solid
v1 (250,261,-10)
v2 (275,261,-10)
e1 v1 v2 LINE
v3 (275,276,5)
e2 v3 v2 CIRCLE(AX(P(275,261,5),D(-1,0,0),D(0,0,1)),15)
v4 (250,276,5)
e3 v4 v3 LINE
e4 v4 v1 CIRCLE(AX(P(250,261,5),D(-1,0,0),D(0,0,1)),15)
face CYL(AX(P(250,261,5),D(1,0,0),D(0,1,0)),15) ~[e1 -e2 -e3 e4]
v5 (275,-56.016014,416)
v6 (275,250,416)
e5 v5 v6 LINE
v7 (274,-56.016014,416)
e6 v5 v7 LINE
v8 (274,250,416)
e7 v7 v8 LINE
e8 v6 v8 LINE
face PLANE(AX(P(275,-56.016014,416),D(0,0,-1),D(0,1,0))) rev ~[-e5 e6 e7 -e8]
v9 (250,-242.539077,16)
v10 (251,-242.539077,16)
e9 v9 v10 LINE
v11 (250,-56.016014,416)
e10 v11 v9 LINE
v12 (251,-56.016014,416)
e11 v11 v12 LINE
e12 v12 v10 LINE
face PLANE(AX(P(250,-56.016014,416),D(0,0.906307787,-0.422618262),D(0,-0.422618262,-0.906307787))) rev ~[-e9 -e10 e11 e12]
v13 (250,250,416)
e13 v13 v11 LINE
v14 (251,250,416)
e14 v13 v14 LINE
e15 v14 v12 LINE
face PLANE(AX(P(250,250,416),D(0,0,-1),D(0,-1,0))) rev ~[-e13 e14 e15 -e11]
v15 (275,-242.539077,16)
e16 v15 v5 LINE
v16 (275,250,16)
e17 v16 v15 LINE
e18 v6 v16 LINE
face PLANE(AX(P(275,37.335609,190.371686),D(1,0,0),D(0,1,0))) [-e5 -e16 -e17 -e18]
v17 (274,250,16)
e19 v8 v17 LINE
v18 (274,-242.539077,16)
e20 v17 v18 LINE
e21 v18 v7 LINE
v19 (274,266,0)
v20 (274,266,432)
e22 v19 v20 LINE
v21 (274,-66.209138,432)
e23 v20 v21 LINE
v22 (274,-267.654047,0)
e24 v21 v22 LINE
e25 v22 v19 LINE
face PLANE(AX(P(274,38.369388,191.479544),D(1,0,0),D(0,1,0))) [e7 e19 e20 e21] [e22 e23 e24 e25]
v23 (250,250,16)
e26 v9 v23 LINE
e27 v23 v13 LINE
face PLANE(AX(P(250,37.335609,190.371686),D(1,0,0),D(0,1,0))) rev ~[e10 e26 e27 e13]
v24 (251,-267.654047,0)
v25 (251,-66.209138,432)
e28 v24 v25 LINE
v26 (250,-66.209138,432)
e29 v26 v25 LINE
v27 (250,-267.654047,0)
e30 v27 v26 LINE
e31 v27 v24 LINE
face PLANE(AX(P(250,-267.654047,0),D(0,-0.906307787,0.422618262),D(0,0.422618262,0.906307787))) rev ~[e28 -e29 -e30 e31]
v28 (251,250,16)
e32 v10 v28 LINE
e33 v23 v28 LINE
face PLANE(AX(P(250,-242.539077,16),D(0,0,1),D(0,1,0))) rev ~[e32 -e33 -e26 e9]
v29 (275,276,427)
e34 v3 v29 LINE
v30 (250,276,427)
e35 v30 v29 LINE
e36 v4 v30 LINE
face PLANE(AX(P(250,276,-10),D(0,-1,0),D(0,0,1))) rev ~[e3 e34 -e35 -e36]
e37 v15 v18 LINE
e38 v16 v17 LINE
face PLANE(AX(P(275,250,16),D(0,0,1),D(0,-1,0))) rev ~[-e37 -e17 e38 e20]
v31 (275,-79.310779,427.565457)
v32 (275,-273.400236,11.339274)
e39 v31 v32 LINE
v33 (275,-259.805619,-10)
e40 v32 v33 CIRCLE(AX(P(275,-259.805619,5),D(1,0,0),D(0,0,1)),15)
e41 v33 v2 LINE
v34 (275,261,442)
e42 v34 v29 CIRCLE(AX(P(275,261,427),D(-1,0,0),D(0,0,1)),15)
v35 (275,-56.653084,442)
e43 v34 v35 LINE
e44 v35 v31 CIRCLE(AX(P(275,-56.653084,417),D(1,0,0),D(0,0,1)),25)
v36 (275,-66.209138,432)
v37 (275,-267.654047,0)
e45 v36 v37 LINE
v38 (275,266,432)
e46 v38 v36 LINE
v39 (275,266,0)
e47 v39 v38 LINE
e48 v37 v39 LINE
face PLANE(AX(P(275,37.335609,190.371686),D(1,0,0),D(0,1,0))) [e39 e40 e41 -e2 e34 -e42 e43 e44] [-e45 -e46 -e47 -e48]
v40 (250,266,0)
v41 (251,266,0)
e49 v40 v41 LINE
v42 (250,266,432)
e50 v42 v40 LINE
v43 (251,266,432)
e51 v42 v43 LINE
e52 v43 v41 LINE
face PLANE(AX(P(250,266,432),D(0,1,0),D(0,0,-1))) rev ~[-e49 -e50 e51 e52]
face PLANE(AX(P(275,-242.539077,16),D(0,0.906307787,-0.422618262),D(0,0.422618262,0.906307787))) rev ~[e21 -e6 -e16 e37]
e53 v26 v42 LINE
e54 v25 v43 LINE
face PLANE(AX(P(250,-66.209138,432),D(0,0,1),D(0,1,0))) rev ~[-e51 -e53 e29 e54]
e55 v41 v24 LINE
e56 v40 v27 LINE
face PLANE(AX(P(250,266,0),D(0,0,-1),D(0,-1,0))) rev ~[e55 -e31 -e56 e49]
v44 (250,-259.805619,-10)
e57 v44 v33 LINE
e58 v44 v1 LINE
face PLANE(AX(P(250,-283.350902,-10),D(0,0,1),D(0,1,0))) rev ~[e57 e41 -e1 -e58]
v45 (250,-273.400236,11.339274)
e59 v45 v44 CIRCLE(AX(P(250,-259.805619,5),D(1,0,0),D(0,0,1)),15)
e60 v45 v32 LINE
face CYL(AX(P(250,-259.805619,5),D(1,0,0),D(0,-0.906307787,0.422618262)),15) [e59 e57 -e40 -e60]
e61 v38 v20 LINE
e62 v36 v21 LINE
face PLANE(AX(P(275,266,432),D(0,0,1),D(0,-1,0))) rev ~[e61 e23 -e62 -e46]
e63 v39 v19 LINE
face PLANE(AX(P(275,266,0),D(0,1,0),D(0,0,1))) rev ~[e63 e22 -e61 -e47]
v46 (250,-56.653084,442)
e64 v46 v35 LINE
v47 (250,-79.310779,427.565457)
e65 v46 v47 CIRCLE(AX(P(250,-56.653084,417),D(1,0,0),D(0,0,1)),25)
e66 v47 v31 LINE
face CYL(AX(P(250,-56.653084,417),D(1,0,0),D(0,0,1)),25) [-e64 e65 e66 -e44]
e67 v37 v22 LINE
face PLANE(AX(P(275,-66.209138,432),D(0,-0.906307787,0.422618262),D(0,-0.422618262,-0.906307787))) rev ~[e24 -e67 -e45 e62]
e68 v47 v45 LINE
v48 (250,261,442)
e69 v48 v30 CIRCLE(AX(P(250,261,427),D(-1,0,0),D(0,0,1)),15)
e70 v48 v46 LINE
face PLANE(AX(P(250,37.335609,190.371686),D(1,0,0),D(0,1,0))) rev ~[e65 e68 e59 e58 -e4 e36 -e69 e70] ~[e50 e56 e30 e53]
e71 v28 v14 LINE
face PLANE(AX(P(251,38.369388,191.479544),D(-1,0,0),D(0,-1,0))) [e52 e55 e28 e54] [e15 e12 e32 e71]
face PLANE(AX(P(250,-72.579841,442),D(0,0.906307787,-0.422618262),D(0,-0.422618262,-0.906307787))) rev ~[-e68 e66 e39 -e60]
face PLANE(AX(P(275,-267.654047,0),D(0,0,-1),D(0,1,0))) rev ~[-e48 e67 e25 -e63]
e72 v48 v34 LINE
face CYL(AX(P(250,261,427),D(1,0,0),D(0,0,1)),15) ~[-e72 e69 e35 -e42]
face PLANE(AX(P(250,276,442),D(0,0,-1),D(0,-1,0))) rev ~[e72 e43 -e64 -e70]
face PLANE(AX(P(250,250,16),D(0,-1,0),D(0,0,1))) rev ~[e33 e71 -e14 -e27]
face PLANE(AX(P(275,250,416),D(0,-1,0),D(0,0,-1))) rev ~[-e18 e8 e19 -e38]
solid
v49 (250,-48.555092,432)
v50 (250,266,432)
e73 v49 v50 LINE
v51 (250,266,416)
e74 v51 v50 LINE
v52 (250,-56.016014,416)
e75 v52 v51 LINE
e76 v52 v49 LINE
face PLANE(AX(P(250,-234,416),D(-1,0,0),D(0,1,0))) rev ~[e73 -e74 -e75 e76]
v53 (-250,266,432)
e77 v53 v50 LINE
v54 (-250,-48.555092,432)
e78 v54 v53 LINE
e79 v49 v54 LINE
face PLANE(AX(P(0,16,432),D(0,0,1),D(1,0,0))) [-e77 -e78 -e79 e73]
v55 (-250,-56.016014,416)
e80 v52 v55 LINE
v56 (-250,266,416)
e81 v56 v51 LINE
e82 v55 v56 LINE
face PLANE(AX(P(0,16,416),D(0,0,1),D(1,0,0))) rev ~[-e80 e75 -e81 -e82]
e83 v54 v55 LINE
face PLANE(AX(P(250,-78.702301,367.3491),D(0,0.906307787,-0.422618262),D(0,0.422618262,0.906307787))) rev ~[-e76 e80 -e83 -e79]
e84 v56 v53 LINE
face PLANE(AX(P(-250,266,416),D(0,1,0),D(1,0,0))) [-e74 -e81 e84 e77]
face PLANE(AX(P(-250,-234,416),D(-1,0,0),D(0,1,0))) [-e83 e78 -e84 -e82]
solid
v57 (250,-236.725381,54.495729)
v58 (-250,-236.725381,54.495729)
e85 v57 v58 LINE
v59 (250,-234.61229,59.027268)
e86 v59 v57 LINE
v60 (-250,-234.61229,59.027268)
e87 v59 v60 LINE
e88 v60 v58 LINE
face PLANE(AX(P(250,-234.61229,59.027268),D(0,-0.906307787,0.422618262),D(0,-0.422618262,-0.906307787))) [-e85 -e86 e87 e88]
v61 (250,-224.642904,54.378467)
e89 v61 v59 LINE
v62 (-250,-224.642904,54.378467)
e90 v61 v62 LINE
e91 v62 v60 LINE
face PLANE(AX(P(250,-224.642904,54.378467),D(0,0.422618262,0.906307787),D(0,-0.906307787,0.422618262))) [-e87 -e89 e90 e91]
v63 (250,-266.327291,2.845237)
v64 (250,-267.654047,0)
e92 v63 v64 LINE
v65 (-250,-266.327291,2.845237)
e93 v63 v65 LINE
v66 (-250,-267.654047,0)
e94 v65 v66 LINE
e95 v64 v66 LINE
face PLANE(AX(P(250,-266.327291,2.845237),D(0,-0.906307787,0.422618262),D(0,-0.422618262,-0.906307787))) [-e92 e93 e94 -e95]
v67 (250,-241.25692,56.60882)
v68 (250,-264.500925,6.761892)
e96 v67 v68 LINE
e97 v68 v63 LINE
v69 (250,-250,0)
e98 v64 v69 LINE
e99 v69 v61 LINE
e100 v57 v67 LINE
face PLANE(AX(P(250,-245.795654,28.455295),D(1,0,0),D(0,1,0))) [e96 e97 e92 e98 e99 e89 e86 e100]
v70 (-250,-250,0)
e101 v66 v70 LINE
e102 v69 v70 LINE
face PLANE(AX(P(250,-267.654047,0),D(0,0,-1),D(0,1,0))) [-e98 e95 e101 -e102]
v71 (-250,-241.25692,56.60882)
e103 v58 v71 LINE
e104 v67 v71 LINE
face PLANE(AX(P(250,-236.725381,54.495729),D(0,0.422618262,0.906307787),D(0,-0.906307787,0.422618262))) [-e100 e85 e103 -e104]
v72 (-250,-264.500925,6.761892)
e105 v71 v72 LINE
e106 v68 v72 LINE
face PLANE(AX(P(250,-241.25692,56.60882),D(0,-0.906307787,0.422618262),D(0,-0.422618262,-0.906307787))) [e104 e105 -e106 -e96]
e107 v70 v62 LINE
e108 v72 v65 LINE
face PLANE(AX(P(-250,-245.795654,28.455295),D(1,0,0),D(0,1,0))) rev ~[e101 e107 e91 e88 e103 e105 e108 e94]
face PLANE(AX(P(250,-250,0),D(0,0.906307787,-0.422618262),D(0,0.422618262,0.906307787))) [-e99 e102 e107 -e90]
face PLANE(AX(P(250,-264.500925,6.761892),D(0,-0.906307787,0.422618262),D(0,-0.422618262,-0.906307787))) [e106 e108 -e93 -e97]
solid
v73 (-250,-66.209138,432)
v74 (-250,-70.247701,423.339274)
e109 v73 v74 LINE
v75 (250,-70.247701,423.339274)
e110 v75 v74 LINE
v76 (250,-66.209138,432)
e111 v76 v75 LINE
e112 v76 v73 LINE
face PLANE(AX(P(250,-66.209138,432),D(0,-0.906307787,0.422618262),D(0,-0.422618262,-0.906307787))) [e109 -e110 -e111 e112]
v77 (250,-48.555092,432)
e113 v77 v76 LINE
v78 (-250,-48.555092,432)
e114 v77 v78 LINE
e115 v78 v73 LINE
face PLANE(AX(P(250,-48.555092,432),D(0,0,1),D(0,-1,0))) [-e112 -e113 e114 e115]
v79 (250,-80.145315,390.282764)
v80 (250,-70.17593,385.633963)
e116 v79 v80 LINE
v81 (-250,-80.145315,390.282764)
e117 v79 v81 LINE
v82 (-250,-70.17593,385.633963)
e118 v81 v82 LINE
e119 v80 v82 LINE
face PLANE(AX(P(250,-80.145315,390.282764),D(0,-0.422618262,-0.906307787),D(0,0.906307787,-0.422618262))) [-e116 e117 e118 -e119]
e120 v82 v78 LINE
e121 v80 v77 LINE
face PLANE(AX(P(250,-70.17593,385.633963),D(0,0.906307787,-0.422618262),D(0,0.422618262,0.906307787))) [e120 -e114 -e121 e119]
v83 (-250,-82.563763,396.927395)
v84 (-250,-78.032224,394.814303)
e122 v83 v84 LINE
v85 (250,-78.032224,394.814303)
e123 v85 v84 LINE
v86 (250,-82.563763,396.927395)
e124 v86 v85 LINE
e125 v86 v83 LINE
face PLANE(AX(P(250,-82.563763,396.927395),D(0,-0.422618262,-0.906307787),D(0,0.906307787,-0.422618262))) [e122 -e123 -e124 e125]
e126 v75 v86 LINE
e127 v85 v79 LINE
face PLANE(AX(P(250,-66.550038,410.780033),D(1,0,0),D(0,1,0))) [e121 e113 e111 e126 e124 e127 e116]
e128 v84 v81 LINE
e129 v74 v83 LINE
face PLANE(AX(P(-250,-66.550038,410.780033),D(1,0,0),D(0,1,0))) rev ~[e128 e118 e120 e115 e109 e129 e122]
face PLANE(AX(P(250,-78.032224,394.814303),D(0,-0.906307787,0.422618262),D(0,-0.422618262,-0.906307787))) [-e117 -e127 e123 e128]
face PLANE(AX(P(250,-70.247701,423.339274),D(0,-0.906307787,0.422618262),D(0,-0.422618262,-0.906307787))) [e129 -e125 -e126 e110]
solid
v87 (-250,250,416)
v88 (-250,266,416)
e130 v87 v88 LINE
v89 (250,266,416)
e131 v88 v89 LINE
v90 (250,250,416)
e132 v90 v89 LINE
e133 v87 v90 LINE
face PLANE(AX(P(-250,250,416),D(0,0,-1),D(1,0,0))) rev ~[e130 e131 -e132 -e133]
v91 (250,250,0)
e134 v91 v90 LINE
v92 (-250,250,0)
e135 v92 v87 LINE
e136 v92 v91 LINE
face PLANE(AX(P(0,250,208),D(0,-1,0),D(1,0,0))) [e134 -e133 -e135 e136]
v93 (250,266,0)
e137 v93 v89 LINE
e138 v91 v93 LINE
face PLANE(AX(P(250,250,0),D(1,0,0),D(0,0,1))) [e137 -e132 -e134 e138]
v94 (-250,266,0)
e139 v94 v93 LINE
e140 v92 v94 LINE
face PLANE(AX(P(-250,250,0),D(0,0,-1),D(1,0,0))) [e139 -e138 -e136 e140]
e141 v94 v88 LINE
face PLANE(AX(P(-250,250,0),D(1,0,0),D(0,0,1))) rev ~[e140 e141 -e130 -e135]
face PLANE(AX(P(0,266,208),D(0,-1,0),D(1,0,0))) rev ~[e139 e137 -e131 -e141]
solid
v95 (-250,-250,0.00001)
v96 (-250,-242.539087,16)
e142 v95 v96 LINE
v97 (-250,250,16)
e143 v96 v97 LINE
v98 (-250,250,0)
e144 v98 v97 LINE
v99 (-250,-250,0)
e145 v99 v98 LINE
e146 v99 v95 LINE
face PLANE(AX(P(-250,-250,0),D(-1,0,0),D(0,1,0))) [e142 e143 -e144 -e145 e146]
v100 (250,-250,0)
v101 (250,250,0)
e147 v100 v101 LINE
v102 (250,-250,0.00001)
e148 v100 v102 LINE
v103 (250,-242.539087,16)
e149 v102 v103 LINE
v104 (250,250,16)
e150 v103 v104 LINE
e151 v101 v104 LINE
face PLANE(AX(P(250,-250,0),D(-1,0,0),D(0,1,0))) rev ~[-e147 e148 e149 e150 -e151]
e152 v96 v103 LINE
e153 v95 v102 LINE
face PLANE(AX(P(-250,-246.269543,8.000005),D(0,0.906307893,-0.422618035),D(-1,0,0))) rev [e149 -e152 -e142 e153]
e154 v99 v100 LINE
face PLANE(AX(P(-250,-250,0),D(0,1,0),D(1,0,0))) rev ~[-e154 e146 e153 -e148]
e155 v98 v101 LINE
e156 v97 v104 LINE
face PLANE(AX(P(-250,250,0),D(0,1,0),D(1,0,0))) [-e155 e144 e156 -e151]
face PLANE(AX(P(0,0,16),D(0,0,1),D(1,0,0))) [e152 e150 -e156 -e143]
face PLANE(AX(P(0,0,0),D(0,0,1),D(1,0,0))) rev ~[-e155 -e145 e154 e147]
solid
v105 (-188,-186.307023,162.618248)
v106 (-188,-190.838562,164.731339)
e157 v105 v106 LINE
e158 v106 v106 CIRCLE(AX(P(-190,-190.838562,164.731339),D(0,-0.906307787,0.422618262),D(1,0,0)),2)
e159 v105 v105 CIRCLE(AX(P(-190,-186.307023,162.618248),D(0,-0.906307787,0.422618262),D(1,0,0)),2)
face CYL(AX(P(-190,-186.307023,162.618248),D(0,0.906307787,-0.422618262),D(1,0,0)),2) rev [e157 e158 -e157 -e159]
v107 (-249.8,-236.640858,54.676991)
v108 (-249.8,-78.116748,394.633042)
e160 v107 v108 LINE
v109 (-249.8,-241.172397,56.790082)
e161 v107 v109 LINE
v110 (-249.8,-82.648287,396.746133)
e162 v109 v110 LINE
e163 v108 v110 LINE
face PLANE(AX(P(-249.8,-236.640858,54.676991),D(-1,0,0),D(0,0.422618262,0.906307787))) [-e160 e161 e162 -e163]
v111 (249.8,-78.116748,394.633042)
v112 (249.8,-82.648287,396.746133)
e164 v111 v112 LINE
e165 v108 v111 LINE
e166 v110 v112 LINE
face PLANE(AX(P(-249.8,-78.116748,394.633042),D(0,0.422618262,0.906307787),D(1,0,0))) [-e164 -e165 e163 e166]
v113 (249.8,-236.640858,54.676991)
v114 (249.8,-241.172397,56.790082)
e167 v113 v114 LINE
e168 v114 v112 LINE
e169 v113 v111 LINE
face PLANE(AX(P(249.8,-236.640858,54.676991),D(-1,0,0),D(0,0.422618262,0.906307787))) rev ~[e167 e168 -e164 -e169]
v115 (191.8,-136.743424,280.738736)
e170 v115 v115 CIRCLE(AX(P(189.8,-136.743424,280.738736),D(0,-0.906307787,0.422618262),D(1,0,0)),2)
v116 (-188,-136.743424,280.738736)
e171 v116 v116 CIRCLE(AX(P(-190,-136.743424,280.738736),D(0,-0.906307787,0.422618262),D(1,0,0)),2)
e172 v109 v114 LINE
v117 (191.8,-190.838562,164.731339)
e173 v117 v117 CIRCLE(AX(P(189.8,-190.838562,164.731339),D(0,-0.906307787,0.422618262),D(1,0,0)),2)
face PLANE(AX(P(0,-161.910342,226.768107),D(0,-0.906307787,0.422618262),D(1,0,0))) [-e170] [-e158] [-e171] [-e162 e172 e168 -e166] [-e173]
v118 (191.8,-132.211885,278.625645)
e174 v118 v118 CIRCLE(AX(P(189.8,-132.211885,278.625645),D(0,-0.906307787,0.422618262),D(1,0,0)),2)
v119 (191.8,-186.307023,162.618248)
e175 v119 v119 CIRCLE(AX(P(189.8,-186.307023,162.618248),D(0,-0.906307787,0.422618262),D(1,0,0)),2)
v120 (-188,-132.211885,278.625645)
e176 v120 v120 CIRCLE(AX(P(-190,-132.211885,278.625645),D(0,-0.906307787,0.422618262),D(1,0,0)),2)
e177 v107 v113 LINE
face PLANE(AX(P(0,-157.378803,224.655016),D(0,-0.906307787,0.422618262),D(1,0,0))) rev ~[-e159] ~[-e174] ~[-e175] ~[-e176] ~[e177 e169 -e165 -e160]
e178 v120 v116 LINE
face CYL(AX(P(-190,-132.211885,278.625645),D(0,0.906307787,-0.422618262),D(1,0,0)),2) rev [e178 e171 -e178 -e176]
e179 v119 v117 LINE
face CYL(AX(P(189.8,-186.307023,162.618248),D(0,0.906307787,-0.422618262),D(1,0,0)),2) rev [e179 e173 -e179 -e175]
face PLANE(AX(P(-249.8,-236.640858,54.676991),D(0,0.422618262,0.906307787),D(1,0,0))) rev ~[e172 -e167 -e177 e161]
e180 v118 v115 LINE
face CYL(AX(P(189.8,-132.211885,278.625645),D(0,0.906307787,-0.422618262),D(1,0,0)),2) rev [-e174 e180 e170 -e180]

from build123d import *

# Parameters (mm, degrees)
F0_W      = 500
F0_H      = 500
F1_DEPTH  = 16
F3_W      = 500
F3_H      = 416
F4_DEPTH  = 16
F5_SIZE2  = 7.460913
F5_SIZE   = 15.99999
F7_DEPTH  = 500
F8_W      = 500
F8_H      = 500
F9_DEPTH  = 16
F11_DEPTH = 500
F13_DEPTH = 500.001
F15_DEPTH = 25
F16_R     = 15
F17_R     = 25
F18_R     = 15
F20_DEPTH = 1
F21_W     = 499.6
F21_H     = 375.1
F21_R     = 2
F22_DEPTH = 5
F24_DEPTH = 1


# Not quite as in the source:
# - a fillet or chamfer is up to 0.001 mm smaller than in the source, because OpenCascade refuses the exact size


with BuildPart() as f1:
    # F0 (on Top) → F1 (new body)
    with BuildSketch(Plane.XY):
        Rectangle(F0_W, F0_H)
    extrude(amount=F1_DEPTH)

    # F5 (size 16 and 7.4609225305 in the source; OpenCascade refuses exactly that, so slightly less here)
    f5_edges = [f1.edges().sort_by_distance(p)[0] for p in [
        (0, -250, 16),
    ]]
    f5_side = f1.faces().sort_by_distance((0, -250, 8))[0]
    chamfer(f5_edges, length=F5_SIZE, length2=F5_SIZE2, reference=f5_side)


with BuildPart() as f4:
    # F3 (on offset) → F4 (new body)
    with BuildSketch(Plane.XZ.offset(-250)):
        with Locations((0, 208)):
            Rectangle(F3_W, F3_H)
    extrude(amount=-F4_DEPTH)


with BuildPart() as f7:
    # F6 (on face) → F7 (new body, through all)
    with BuildSketch(Plane.YZ.offset(250)):
        Polygon((-264.5146755492, 0), (-250, 0), (-224.6429042956, 54.3784672222), (-234.612289953, 59.0272681013), (-236.7253812617, 54.4957291662), (-241.2569201968, 56.6088204749), (-264.5009245926, 6.7618921879), (-266.3272911232, 2.8452365235), (-267.6540467034, 0), align=None)
    extrude(amount=-F7_DEPTH)


with BuildPart() as f9:
    # F8 (on face) → F9 (new body)
    with BuildSketch(Plane.XY.offset(416)):
        with Locations((0, 16)):
            Rectangle(F8_W, F8_H)
    extrude(amount=F9_DEPTH)

    # F12 (on face) → F13 (cut, through all)
    with BuildSketch(Plane.YZ.offset(250)):
        Polygon((-78.702301391, 367.3491001344), (-31.9454936648, 467.6193978841), (-288.1607642735, 474.7963037545), (-288.1607642735, 367.3491001344), align=None)
    extrude(amount=-F13_DEPTH, mode=Mode.SUBTRACT)


with BuildPart() as f11:
    # F10 (on face) → F11 (new body, through all)
    with BuildSketch(Plane.YZ.offset(250)):
        Polygon((-70.1759296293, 385.6339633841), (-48.555091677, 432), (-56.6530844683, 432), (-66.2091383804, 432), (-70.2477012739, 423.3392739261), (-82.5637629132, 396.9273945071), (-78.032223978, 394.8143031984), (-80.1453152867, 390.2827642632), align=None)
    extrude(amount=-F11_DEPTH)


with BuildPart() as f15:
    # F14 (on face) → F15 (new body)
    with BuildSketch(Plane.YZ.offset(250)):
        Polygon((276, -10), (276, 442), (-72.5798409885, 442), (-283.3509024746, -10), align=None)
    extrude(amount=F15_DEPTH)

    # F16
    f16_edges = [f15.edges().sort_by_distance(p)[0] for p in [
        (262.5, 276, -10),
        (262.5, -283.350902, -10),
    ]]
    fillet(f16_edges, radius=F16_R)

    # F17
    f17_edges = [f15.edges().sort_by_distance(p)[0] for p in [
        (262.5, -72.579841, 442),
    ]]
    fillet(f17_edges, radius=F17_R)

    # F18
    f18_edges = [f15.edges().sort_by_distance(p)[0] for p in [
        (262.5, 276, 442),
    ]]
    fillet(f18_edges, radius=F18_R)

    # F19 (on face) → F20 (cut)
    with BuildSketch(Plane(origin=(250, 0, 0), x_dir=(0, -1, 0), z_dir=(-1, 0, 0))):
        Polygon((-266, 0), (267.6540467034, 0), (66.2091383804, 432), (-266, 432), align=None)
        Polygon((-250, 16), (-250, 416), (56.0160142075, 416), (242.5390774695, 16), align=None, mode=Mode.SUBTRACT)
    extrude(amount=-F20_DEPTH, mode=Mode.SUBTRACT)

    # F23 (on face) → F24 (cut)
    with BuildSketch(Plane.YZ.offset(275)):
        Polygon((266, 0), (266, 432), (-66.2091383804, 432), (-267.6540467034, 0), align=None)
        Polygon((-56.0160142075, 416), (250, 416), (250, 16), (-242.5390774695, 16), align=None, mode=Mode.SUBTRACT)
    extrude(amount=-F24_DEPTH, mode=Mode.SUBTRACT)


with BuildPart() as f22:
    # F21 (on face) → F22 (new body)
    with BuildSketch(Plane(origin=(0, -215.3178368682, 100.404356269), x_dir=(1, 0, 0), z_dir=(0, -0.906307787, 0.4226182617))):
        with Locations((0, 137.0954345648)):
            Rectangle(F21_W, F21_H)
        with Locations((-190, 68.6454345648)):
            Circle(F21_R, mode=Mode.SUBTRACT)
        with Locations((189.8, 68.6454345648)):
            Circle(F21_R, mode=Mode.SUBTRACT)
        with Locations((-190, 196.6454345648)):
            Circle(F21_R, mode=Mode.SUBTRACT)
        with Locations((189.8, 196.6454345648)):
            Circle(F21_R, mode=Mode.SUBTRACT)
    extrude(amount=F22_DEPTH)


solid = Compound([f1.part, f4.part, f7.part, f9.part, f11.part, f15.part, f22.part])
